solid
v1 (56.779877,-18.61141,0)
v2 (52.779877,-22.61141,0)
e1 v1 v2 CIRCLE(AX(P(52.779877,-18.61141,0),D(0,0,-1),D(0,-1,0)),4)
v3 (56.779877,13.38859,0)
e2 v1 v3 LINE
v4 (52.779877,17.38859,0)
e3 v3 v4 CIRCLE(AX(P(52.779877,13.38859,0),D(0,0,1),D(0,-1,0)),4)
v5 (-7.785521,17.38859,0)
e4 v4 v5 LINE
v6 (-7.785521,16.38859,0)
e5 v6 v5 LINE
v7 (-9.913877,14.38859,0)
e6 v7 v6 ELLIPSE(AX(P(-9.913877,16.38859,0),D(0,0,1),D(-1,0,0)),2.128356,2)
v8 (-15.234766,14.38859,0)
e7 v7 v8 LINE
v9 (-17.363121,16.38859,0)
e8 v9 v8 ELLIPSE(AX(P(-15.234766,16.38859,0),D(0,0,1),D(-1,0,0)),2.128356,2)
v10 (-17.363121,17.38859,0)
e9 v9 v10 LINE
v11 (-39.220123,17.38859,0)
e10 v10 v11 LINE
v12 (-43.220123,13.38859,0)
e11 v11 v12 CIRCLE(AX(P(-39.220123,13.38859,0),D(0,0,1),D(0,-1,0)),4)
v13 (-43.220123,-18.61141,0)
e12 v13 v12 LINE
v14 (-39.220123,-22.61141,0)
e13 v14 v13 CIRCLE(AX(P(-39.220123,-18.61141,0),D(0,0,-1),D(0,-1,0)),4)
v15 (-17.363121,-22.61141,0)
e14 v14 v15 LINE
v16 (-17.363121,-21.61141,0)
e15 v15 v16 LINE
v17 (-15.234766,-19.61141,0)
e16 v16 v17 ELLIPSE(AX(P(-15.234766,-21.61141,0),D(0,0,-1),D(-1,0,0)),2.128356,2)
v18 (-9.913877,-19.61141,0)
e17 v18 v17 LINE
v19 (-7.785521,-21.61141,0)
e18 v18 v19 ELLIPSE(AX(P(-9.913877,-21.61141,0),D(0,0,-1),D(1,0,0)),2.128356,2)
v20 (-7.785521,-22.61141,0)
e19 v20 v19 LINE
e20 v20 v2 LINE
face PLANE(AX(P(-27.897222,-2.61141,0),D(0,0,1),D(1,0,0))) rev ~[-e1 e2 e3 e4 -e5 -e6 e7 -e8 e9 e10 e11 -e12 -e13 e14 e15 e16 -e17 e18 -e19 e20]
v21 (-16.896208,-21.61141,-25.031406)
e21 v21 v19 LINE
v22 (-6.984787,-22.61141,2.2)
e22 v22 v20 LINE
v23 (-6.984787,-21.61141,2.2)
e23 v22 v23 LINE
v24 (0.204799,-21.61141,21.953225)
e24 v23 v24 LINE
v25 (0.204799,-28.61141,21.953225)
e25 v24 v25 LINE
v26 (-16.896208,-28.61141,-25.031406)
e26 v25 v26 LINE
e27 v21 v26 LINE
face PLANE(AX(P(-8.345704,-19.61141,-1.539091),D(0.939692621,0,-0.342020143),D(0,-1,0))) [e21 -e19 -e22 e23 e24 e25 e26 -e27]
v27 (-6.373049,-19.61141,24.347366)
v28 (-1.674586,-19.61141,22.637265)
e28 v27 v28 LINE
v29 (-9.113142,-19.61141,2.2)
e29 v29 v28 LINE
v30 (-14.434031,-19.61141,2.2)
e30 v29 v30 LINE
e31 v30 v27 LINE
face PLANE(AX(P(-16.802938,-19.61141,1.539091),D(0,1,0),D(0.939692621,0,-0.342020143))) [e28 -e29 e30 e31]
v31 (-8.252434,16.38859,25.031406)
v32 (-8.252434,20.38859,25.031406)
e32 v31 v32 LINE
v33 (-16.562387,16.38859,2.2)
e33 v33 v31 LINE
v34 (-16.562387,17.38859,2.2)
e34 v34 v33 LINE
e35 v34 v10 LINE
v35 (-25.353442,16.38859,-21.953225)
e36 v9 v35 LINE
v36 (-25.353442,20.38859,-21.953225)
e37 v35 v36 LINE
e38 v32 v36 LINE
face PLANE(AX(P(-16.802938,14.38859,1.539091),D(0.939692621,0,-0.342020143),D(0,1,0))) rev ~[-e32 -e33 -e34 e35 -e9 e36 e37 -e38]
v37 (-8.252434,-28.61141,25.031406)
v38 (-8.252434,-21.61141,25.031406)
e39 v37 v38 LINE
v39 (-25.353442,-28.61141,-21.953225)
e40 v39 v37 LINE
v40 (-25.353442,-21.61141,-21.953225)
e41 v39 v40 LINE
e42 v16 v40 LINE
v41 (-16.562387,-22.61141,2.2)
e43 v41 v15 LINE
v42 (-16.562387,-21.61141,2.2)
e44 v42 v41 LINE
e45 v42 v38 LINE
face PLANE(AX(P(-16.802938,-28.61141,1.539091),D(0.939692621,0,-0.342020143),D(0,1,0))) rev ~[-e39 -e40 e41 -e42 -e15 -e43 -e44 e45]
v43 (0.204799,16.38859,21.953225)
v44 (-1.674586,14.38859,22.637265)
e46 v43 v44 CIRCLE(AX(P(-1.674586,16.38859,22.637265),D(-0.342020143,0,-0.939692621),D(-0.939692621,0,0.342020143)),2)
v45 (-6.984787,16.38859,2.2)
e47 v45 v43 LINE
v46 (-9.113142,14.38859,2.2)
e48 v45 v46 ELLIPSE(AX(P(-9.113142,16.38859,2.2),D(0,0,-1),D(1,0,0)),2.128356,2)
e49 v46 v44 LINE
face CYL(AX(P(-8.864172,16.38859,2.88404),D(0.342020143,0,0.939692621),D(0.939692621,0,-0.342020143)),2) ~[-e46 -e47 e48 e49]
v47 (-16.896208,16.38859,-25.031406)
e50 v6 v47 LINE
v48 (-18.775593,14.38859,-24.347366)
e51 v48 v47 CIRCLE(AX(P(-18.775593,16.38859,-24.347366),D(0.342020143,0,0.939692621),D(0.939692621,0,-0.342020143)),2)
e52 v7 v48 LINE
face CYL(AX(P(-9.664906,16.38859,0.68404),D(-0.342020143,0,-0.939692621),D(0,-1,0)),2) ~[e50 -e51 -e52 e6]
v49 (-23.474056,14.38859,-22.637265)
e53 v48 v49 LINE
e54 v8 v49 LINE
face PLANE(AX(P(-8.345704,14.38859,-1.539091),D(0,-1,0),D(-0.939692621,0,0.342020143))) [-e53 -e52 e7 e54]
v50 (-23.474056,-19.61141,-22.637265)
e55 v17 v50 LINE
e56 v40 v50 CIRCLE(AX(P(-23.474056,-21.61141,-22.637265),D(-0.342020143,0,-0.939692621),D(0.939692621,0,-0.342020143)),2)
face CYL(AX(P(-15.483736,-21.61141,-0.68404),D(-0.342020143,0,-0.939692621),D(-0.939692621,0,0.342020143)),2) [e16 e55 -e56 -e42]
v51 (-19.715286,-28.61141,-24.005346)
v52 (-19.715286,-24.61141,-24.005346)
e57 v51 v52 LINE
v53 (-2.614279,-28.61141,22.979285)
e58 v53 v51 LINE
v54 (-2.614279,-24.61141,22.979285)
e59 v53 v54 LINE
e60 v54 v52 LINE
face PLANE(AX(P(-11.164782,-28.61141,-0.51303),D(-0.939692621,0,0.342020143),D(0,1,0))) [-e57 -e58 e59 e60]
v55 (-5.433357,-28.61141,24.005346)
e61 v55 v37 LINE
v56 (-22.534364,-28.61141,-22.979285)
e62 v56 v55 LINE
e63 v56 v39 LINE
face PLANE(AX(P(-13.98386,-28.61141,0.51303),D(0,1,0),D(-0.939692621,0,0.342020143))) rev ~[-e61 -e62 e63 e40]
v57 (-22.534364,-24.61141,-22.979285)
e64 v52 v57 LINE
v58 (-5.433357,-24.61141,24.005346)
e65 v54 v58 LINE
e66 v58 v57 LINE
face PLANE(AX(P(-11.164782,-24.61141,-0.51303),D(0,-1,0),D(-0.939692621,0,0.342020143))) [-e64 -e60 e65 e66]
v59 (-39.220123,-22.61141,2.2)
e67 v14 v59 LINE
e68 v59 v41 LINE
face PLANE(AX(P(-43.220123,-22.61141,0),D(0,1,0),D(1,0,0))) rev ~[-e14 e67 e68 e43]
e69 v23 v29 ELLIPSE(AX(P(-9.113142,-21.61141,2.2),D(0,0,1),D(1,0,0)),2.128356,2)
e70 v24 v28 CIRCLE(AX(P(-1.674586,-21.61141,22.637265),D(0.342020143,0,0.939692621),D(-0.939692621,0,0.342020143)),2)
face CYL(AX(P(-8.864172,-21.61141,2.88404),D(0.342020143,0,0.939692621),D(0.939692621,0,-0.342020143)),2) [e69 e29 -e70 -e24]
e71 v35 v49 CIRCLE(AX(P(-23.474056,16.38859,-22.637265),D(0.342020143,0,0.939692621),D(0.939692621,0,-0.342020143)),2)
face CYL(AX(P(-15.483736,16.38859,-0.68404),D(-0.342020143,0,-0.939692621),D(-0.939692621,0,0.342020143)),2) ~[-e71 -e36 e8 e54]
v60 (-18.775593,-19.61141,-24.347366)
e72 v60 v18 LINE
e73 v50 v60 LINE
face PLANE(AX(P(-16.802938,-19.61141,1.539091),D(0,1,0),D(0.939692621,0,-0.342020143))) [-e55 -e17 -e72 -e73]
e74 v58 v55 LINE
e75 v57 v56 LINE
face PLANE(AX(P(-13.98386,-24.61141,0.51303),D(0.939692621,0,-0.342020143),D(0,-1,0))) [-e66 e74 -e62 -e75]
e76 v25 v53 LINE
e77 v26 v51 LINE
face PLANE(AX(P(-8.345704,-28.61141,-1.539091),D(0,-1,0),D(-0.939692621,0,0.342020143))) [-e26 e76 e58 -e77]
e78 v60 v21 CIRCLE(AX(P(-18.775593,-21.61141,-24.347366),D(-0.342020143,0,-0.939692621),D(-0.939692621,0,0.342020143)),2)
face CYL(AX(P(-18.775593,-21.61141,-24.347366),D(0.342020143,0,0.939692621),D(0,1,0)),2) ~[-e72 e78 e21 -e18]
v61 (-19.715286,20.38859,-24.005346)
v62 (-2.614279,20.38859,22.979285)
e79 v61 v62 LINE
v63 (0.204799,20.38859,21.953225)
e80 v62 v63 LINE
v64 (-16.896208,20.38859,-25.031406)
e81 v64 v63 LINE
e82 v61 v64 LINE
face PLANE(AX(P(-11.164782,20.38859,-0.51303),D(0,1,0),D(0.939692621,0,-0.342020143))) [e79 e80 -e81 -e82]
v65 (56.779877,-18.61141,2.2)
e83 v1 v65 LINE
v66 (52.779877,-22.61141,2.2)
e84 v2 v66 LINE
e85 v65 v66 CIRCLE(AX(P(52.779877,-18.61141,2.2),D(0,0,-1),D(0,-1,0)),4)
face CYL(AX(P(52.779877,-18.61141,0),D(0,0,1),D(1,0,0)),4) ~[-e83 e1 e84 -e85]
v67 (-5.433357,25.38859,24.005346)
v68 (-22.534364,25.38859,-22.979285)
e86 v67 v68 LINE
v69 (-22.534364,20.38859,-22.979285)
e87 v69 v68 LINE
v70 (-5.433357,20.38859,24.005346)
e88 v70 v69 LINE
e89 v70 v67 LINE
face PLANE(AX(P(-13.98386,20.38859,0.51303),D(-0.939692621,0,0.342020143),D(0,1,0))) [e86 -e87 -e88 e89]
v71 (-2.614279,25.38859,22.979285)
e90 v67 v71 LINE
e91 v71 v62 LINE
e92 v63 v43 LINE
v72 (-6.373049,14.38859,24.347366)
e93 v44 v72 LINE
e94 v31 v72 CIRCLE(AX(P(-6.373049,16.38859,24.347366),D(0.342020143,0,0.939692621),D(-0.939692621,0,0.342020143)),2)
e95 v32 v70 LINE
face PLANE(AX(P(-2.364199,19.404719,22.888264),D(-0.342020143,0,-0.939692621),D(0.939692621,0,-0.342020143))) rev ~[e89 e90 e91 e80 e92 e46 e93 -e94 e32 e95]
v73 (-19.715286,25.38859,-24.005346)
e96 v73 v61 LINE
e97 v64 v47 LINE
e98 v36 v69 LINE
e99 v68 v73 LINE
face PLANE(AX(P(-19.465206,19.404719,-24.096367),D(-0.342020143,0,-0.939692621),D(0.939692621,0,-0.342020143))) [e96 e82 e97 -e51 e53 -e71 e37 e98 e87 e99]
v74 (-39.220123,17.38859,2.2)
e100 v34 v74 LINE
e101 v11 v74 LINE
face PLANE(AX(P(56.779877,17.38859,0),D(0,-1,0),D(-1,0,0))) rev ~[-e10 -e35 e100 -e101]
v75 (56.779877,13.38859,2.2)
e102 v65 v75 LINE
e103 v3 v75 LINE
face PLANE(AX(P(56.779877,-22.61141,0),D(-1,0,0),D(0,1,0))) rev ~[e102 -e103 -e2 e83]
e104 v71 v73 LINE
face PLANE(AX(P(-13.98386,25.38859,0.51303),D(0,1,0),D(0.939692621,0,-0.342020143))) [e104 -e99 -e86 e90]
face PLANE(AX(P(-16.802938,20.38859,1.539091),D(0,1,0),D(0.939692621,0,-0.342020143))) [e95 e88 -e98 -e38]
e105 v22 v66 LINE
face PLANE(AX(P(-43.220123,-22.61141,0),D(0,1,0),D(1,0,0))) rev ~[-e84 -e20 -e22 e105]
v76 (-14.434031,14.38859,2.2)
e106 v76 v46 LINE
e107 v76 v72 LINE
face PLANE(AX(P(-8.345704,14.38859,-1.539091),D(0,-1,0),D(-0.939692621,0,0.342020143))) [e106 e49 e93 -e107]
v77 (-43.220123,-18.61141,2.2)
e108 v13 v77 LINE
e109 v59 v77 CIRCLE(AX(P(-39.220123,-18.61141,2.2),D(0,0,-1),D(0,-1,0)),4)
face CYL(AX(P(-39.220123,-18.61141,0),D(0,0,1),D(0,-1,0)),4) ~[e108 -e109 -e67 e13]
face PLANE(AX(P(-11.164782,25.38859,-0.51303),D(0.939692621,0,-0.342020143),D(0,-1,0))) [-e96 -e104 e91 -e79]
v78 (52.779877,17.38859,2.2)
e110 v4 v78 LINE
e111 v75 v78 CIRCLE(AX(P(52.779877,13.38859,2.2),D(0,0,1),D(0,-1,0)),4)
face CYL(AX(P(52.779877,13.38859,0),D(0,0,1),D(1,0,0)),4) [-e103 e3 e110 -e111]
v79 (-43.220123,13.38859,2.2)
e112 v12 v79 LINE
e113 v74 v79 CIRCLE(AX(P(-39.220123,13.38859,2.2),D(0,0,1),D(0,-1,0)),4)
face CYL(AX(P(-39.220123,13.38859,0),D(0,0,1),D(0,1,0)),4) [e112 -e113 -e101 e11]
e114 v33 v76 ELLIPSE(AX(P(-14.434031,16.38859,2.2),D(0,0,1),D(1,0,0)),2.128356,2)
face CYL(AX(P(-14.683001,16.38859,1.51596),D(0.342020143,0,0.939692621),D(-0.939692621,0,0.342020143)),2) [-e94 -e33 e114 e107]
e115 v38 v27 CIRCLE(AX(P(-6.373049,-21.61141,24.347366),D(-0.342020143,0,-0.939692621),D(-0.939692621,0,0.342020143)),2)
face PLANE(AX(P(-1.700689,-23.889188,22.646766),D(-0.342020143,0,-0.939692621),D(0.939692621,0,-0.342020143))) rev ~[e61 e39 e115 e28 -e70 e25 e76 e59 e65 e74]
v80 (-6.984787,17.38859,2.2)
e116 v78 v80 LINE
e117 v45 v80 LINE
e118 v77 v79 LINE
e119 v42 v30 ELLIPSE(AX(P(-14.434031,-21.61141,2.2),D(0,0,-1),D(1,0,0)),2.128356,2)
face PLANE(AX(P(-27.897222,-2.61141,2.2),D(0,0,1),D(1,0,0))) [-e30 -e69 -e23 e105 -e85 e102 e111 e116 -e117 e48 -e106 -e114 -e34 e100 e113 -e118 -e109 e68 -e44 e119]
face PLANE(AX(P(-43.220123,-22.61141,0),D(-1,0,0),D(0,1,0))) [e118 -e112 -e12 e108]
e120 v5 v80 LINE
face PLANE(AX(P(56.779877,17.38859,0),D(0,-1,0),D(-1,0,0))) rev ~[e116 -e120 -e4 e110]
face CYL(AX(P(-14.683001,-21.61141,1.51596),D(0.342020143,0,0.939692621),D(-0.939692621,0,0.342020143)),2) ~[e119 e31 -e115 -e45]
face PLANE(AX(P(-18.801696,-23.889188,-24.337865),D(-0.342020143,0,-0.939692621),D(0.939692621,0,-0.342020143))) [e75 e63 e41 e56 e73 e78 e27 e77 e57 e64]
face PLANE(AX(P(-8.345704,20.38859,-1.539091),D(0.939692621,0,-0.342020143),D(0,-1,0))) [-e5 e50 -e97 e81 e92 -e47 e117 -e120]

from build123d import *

# Parameters (mm, degrees)
F0_W          = 30.6458014898
F0_H          = 40
F0_W_2        = 69.3541985102
F1_DEPTH      = 2.2
F4_DEPTH      = 25
F4_DEPTH_BACK = 25
F5_R          = 4
F6_R          = 2


# Not quite as in the source:
# - a feature names something its author has since deleted; it is built from what else it names


with BuildPart() as f1:
    # F0 (on Top) → F1 (new body)
    with BuildSketch(Plane.XY):
        with Locations((-27.8972219743, -2.6114098728)):
            Rectangle(F0_W, F0_H)
        with Locations((22.1027780257, -2.6114098728)):
            Rectangle(F0_W_2, F0_H)
    extrude(amount=F1_DEPTH)

    # F3 (on line) → F4 (join, two sides)
    with BuildSketch(Plane(origin=(-1.4709161628, 0, -4.0413089432), x_dir=(0.9396926208, 0, -0.3420201433), z_dir=(-0.3420201433, 0, -0.9396926208))) as f4_sk:
        Polygon((-7.3159968707, -20.3885901272), (-7.3159968707, -14.3885901272), (-11.8159968707, -14.3885901272), (-11.8159968707, -25.3885901272), (-10.3159968707, -25.3885901272), (-10.3159968707, -20.3885901272), align=None)
        Polygon((-11.8159968707, 19.6114098728), (-7.3159968707, 19.6114098728), (-7.3159968707, 28.6114098728), (-10.3159968707, 28.6114098728), (-10.3159968707, 24.6114098728), (-11.8159968707, 24.6114098728), align=None)
        Polygon((-11.8159968707, -25.3885901272), (-11.8159968707, -14.3885901272), (-16.3159968707, -14.3885901272), (-16.3159968707, -20.3885901272), (-13.3159968707, -20.3885901272), (-13.3159968707, -25.3885901272), align=None)
        Polygon((-16.3159968707, 19.6114098728), (-11.8159968707, 19.6114098728), (-11.8159968707, 24.6114098728), (-13.3159968707, 24.6114098728), (-13.3159968707, 28.6114098728), (-16.3159968707, 28.6114098728), align=None)
    extrude(amount=F4_DEPTH)
    extrude(f4_sk.sketch, amount=-F4_DEPTH_BACK)

    # F5
    f5_edges = [f1.edges().sort_by_distance(p)[0] for p in [
        (-43.220123, 17.38859, 1.1),
        (-43.220123, -22.61141, 1.1),
        (56.779877, -22.61141, 1.1),
        (56.779877, 17.38859, 1.1),
    ]]
    fillet(f5_edges, radius=F5_R)

    # F6
    f6_edges = [f1.edges().sort_by_distance(p)[0] for p in [
        (-3.389994, -19.61141, 12.076612),
        (-12.407411, -19.61141, 13.615703),
        (-3.389994, 14.38859, 12.076612),
        (-12.340865, 14.38859, -12.515703),
        (-12.407411, 14.38859, 13.615703),
        (-21.358281, 14.38859, -10.976612),
        (-21.358281, -19.61141, -10.976612),
        (-12.340865, -19.61141, -12.515703),
    ]]
    fillet(f6_edges, radius=F6_R)


solid = f1.part
